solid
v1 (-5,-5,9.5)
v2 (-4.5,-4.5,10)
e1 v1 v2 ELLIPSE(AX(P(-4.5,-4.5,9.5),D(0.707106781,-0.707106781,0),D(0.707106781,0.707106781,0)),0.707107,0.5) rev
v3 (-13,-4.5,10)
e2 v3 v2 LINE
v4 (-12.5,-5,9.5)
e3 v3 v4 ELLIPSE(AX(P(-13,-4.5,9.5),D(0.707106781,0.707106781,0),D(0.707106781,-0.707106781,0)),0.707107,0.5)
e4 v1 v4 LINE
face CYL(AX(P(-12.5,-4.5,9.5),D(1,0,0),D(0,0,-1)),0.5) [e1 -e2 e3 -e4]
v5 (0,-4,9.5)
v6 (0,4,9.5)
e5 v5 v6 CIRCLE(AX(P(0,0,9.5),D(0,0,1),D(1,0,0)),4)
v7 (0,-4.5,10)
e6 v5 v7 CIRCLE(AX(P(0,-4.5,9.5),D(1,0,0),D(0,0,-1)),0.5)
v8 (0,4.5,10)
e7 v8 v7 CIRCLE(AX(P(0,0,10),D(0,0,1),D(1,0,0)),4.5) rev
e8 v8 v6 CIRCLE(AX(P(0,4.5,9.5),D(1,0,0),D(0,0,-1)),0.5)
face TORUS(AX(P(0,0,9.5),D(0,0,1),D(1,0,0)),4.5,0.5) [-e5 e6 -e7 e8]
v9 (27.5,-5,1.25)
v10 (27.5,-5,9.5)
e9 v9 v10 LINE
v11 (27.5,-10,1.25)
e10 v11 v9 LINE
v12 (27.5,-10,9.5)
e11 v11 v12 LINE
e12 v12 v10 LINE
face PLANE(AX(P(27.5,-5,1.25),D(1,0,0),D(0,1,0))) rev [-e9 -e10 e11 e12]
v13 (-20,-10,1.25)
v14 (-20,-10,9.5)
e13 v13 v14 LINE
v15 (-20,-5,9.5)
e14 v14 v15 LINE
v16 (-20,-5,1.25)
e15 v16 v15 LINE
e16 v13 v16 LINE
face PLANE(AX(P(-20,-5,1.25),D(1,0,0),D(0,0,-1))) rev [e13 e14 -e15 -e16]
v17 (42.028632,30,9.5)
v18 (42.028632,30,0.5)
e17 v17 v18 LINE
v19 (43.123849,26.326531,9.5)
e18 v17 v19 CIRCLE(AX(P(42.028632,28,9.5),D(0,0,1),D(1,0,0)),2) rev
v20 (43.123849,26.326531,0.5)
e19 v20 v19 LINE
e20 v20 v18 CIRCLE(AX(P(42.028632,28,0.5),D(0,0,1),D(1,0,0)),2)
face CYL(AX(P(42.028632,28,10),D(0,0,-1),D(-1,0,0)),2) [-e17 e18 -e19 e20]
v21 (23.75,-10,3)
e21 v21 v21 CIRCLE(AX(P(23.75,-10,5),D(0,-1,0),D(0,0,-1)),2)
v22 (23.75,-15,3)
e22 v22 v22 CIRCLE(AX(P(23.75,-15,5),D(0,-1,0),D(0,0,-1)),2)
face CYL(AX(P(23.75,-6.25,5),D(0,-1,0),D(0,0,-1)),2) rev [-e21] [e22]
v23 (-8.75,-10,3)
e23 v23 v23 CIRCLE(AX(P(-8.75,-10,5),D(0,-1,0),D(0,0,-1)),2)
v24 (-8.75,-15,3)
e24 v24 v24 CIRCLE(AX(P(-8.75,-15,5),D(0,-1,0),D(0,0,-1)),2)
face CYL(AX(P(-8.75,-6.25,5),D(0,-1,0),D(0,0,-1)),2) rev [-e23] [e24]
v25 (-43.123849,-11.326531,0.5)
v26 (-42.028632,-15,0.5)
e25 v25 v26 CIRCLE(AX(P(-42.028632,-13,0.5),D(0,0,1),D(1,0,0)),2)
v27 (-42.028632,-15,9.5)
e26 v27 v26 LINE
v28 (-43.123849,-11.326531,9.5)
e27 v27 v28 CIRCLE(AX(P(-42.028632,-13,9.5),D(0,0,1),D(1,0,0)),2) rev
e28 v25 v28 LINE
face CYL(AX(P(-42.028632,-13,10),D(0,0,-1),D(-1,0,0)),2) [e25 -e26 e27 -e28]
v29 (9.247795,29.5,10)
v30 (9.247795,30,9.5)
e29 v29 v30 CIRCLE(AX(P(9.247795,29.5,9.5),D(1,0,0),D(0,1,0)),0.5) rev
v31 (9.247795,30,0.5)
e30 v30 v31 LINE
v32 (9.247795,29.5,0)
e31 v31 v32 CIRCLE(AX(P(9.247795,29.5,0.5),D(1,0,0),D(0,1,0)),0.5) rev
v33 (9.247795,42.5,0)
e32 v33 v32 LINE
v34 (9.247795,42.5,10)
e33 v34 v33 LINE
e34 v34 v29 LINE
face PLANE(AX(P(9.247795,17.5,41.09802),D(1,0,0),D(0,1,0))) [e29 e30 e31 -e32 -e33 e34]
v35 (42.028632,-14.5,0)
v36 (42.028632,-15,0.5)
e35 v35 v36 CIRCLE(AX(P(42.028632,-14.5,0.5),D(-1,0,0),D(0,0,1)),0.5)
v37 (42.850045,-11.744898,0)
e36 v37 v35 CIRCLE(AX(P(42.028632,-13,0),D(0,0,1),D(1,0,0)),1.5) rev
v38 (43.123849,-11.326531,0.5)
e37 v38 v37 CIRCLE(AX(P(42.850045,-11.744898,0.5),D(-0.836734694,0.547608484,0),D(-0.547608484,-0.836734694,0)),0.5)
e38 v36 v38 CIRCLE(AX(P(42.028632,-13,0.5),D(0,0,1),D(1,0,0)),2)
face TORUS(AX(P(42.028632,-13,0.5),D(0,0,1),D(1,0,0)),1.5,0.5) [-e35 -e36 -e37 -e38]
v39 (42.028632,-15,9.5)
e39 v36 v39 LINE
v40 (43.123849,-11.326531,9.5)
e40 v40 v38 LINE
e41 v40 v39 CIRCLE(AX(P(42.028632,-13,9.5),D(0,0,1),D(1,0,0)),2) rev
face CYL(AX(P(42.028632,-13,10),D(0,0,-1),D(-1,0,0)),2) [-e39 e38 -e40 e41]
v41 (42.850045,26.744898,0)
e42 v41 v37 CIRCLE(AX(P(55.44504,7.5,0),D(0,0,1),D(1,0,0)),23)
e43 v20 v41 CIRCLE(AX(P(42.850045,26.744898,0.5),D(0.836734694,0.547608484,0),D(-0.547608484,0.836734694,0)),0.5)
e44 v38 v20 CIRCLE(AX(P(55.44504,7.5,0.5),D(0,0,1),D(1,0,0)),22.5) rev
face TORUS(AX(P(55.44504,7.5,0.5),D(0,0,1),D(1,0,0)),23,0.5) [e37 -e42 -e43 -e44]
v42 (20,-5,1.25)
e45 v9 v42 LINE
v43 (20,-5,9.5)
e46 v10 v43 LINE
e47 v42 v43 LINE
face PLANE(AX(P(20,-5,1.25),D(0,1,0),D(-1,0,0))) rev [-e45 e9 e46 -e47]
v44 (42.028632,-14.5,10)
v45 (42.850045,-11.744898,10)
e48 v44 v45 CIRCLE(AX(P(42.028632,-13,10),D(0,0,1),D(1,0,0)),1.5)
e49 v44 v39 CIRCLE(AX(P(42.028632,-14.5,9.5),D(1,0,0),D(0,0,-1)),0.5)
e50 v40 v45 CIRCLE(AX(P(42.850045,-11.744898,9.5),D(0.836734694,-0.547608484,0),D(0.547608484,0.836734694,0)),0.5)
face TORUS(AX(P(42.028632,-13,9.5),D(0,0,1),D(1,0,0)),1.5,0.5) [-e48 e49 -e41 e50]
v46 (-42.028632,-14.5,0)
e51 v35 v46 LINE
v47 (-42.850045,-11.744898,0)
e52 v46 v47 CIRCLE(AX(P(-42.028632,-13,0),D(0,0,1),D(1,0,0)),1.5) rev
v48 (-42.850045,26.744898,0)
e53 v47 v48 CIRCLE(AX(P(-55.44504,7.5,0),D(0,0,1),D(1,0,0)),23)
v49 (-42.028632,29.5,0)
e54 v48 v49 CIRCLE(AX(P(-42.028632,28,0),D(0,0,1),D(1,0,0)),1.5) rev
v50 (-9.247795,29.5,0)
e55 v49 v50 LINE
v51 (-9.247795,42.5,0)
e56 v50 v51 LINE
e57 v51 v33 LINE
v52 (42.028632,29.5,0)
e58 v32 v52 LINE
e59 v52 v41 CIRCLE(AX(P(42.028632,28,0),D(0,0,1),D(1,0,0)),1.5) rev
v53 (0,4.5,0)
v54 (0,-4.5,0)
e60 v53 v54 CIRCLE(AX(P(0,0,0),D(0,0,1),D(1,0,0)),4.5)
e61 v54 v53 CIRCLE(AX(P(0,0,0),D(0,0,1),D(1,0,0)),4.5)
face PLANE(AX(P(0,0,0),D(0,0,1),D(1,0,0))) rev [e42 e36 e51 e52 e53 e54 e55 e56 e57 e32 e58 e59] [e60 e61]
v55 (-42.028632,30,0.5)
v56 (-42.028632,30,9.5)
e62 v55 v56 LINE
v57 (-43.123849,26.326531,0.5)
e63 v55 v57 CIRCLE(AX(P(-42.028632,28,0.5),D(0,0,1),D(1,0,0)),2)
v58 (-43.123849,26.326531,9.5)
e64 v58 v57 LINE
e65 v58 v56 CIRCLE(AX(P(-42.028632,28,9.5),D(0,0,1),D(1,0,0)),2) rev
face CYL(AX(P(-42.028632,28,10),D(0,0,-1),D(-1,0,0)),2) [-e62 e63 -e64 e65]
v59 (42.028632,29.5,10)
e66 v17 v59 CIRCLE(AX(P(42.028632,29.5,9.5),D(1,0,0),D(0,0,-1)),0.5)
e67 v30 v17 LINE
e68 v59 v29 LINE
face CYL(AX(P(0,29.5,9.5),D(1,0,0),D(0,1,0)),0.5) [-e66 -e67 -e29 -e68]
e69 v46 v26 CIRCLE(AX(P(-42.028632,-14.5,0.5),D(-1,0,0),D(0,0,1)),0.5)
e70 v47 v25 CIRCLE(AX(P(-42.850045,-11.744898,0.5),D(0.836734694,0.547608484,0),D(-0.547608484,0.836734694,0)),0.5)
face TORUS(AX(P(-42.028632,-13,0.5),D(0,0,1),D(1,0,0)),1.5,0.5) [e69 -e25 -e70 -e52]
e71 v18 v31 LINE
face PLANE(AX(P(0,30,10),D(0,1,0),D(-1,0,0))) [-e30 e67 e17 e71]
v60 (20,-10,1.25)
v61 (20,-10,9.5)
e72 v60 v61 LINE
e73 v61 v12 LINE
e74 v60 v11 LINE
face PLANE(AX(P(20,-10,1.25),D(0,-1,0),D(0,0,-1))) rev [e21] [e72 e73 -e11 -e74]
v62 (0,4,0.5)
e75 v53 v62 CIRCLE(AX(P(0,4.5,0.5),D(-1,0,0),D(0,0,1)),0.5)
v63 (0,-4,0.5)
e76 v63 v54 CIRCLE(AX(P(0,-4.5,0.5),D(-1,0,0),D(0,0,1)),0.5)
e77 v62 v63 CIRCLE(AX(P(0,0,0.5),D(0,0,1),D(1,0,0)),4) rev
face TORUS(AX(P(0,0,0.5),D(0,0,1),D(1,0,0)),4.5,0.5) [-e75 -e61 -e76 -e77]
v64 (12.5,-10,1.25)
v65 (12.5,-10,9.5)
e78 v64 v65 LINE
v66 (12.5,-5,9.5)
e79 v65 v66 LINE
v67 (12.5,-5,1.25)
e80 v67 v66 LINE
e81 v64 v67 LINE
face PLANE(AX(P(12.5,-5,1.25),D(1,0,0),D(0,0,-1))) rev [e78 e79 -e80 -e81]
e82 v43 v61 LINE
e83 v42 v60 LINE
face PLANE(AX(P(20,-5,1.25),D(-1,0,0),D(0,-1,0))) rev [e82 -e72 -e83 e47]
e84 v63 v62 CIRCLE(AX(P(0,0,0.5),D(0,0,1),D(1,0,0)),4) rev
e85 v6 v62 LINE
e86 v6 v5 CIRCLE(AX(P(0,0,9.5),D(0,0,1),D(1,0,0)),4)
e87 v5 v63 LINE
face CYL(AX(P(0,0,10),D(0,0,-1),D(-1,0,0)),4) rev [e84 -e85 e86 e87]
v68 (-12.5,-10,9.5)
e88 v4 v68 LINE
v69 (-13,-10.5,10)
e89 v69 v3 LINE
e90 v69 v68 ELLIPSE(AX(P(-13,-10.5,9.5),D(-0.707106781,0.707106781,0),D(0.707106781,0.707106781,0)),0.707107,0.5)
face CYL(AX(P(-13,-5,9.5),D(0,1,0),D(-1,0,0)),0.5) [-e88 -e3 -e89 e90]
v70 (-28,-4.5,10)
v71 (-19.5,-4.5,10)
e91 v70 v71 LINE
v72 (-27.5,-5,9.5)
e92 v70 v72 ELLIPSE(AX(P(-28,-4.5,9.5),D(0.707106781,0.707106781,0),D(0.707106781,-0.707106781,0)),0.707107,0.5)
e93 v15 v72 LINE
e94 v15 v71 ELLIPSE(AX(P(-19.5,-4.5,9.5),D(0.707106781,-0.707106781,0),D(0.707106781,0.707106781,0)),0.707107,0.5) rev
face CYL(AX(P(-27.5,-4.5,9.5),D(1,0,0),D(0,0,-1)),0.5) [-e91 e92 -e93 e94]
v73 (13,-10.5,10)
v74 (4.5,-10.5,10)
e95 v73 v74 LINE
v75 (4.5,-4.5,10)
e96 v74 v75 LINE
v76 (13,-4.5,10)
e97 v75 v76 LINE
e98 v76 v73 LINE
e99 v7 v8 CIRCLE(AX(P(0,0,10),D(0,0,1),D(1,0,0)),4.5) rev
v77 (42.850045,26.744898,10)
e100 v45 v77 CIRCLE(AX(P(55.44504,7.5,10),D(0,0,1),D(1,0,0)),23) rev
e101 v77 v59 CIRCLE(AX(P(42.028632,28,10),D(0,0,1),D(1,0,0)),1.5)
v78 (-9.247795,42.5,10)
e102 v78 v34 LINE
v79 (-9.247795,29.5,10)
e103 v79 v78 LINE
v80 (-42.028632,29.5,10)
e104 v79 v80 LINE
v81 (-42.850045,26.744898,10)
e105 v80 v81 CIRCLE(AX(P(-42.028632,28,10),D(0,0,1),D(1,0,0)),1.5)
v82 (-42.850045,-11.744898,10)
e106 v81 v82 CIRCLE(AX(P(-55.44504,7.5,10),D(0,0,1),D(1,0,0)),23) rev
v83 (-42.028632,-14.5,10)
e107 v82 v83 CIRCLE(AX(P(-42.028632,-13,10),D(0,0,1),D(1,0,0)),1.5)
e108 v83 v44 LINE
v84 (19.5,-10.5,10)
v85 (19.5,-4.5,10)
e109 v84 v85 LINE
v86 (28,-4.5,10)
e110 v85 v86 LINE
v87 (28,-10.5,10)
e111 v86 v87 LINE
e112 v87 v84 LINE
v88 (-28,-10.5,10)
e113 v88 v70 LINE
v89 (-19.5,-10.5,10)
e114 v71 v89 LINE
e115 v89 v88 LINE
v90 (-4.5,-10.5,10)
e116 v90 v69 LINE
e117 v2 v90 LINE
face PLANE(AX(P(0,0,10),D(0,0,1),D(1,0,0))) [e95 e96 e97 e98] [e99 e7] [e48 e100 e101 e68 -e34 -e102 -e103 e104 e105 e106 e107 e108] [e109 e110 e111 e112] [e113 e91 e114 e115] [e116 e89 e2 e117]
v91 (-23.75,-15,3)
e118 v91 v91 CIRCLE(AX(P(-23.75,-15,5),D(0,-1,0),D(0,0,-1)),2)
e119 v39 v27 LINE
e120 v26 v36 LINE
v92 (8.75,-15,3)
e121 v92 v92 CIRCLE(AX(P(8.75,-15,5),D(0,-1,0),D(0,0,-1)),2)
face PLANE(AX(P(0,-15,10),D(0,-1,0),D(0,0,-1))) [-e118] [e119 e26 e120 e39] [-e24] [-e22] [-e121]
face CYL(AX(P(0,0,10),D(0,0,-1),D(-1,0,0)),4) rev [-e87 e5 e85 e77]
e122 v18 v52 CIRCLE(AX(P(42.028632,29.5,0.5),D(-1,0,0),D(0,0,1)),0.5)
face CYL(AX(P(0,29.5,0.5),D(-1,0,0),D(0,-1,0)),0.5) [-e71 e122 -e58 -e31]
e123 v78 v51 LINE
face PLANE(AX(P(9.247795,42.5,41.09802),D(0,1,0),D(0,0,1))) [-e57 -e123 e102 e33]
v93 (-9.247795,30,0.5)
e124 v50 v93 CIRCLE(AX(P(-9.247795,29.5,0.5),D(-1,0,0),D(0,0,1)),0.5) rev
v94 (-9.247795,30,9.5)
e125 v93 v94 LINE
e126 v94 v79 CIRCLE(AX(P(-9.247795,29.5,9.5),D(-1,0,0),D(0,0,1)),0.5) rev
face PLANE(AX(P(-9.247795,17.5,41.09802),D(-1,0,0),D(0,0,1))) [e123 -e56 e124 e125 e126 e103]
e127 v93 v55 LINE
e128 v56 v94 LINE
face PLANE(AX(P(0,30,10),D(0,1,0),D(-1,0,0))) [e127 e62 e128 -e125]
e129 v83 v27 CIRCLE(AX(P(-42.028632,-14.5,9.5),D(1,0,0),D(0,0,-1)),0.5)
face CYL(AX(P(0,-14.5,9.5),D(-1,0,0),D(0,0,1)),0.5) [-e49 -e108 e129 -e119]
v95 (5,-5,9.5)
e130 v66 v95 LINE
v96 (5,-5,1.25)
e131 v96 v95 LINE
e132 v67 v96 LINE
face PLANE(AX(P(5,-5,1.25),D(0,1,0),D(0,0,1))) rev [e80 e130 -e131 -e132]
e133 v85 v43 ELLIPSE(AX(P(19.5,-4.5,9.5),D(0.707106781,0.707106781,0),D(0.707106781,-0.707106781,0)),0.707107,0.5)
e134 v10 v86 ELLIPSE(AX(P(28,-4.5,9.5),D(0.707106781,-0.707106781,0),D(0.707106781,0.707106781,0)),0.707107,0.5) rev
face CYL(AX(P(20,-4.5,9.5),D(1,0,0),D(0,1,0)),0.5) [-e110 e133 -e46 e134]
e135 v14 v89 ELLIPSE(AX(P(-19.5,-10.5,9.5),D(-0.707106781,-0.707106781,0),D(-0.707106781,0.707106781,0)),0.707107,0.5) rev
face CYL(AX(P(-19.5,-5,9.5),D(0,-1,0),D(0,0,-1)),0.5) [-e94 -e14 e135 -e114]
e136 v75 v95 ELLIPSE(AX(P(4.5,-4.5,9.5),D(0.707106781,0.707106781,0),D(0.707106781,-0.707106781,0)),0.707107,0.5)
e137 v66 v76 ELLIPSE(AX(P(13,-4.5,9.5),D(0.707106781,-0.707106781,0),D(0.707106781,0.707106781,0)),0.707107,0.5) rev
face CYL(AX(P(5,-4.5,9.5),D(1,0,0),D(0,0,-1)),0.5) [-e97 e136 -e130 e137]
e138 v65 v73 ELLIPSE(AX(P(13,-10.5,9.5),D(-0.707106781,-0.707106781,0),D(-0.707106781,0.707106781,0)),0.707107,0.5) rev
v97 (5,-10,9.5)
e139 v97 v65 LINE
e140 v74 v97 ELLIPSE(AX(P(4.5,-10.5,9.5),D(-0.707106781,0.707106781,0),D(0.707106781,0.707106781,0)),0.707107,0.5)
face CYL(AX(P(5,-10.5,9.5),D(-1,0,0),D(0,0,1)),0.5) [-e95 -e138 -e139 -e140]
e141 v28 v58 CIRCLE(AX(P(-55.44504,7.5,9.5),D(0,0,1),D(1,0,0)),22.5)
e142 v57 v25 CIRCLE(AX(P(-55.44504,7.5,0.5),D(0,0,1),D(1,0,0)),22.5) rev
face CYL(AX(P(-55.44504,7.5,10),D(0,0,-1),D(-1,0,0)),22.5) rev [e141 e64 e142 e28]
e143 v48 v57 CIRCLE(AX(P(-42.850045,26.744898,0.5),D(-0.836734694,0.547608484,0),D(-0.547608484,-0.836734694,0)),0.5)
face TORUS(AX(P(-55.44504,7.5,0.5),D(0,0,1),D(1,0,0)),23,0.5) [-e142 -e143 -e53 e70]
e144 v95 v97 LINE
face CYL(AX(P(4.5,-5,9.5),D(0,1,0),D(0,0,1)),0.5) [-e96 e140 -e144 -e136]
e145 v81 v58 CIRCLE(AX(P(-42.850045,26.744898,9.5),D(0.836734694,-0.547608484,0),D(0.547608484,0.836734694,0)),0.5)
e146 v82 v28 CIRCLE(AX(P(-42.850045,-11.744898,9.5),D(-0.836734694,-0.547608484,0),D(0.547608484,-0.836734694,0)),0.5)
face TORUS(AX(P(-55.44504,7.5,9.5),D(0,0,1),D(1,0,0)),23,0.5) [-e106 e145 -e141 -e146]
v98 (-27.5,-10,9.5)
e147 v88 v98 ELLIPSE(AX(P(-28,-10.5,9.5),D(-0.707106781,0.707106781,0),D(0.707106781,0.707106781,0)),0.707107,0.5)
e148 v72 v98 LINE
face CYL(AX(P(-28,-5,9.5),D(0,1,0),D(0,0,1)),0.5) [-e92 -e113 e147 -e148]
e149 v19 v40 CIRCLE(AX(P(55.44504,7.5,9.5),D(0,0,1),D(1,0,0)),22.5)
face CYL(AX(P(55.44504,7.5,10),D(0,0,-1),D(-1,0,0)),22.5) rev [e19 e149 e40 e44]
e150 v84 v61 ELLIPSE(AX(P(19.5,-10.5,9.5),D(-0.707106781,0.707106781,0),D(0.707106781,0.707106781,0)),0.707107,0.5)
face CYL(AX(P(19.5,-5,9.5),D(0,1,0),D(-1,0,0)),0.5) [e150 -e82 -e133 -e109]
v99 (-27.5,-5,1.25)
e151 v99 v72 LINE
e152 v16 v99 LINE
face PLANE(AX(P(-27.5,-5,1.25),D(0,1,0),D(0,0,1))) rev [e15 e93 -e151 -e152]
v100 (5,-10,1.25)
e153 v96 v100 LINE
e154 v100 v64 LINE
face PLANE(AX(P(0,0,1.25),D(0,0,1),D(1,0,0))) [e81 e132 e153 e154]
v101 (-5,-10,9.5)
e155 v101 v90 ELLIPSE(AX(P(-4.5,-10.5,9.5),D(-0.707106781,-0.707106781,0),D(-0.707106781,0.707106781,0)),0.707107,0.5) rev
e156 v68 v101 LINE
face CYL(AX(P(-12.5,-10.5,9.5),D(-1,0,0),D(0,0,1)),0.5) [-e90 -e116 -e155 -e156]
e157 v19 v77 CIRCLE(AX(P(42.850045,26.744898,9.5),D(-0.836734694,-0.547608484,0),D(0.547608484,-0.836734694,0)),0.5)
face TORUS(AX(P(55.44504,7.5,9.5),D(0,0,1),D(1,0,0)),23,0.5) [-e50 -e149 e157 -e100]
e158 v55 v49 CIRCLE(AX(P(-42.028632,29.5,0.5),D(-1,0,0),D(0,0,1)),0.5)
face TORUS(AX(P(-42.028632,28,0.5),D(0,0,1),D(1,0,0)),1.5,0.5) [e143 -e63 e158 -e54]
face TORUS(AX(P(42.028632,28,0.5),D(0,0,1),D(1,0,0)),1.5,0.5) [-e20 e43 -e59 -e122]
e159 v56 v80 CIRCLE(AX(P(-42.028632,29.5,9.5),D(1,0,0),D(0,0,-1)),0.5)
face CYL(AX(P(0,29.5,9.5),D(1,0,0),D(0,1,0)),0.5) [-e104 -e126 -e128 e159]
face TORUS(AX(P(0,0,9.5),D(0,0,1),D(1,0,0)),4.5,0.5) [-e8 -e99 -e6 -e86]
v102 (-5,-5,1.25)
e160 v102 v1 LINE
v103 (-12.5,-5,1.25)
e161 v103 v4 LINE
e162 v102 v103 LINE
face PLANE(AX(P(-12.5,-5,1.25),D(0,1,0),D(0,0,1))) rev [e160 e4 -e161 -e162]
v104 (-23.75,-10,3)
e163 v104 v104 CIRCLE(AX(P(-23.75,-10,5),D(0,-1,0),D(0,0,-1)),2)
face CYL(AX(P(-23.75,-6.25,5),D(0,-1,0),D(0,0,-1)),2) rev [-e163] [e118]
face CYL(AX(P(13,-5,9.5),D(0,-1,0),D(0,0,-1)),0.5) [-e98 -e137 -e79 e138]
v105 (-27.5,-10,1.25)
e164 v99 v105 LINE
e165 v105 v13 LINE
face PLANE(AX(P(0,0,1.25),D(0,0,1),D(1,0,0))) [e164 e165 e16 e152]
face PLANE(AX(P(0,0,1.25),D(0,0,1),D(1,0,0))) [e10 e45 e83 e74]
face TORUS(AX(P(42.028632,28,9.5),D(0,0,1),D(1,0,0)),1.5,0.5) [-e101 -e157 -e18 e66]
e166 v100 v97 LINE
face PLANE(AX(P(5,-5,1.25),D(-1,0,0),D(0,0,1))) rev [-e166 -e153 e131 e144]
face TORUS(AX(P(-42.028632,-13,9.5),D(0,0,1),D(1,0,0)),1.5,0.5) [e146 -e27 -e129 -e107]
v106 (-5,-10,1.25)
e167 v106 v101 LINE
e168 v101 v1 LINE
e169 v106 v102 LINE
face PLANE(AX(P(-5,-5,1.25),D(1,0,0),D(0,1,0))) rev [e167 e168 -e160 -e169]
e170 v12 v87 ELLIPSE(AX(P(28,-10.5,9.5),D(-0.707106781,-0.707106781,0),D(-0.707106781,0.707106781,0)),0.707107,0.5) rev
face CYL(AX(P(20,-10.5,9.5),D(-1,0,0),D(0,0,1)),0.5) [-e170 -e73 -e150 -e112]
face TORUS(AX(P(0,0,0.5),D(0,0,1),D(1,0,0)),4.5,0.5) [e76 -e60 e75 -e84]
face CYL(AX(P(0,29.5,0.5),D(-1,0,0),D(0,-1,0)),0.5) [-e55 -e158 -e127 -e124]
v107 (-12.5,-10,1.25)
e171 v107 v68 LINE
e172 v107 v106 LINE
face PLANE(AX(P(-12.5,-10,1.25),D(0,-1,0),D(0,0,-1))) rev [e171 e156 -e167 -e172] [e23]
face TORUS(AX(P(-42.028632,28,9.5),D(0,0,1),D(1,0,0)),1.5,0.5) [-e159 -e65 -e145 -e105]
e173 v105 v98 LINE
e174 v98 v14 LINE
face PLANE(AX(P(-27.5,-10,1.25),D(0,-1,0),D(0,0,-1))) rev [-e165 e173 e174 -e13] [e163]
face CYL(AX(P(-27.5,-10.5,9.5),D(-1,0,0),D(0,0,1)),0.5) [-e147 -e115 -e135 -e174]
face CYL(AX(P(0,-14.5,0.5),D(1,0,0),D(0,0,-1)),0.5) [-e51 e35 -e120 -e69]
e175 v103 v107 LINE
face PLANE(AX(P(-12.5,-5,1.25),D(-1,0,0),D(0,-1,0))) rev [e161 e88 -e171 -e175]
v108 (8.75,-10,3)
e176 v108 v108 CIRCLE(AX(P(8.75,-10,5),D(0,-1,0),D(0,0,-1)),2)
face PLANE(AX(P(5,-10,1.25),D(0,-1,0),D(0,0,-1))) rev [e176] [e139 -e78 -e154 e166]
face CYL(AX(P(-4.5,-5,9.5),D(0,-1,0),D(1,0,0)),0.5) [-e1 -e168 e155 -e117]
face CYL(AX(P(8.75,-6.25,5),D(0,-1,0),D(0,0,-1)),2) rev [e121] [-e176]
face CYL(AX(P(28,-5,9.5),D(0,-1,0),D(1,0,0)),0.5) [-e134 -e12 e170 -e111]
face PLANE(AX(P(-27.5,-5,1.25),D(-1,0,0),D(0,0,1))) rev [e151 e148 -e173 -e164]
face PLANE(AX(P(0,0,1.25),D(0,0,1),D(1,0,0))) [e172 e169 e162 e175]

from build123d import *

# Parameters (mm, degrees)
BOSS_EXTRUDE1_DEPTH = 10
FILLET1_START       = -1
FILLET1_DEPTH       = 12
SKETCH2_W           = 7.5
SKETCH2_H           = 5
CUT_EXTRUDE1_DEPTH  = 8.75
SKETCH3_R           = 2
CUT_EXTRUDE2_DEPTH  = 8.75
FILLET2_R           = 0.5
BOSS_EXTRUDE2_START = -10
SKETCH5_W           = 18.495590606
SKETCH5_H           = 25
BOSS_EXTRUDE2_DEPTH = 10


with BuildPart() as part:
    # Sketch1 → Boss-Extrude1 (new body)
    with BuildSketch(Plane.XY):
        with BuildLine():
            Line((0, -15), (55.445040355, -15))
            ThreePointArc((55.445040355, -15), (32.945040355, 7.5), (55.445040355, 30))
            Line((55.445040355, 30), (-55.445040355, 30))
            ThreePointArc((-55.445040355, 30), (-39.535137779, 23.409902577), (-32.945040355, 7.5))
            ThreePointArc((-32.945040355, 7.5), (-39.535137779, -8.409902577), (-55.445040355, -15))
            Line((-55.445040355, -15), (0, -15))
        make_face()
        with BuildLine():
            ThreePointArc((4, 0), (2.828427125, -2.828427125), (0, -4))
            ThreePointArc((0, -4), (-4, 0), (0, 4))
            ThreePointArc((0, 4), (2.828427125, 2.828427125), (4, 0))
        make_face(mode=Mode.SUBTRACT)
    extrude(amount=BOSS_EXTRUDE1_DEPTH)

    # Fillet1: read off the stored shape, not the designer's step
    # Fillet1 outline → Fillet1 (cut)
    with BuildSketch(Plane.XY.offset(FILLET1_START)):
        with BuildLine():
            Line((55.445040355, 30), (42.02863249, 30))
            ThreePointArc((42.02863249, 30), (43.945262185, 28.571428571), (43.123849459, 26.326530612))
            ThreePointArc((43.123849459, 26.326530612), (49.016468927, 29.062084069), (55.445040355, 30))
        make_face()
        with BuildLine():
            ThreePointArc((-43.123849459, 26.326530612), (-43.945262185, 28.571428571), (-42.02863249, 30))
            Line((-42.02863249, 30), (-55.445040355, 30))
            ThreePointArc((-55.445040355, 30), (-49.016468927, 29.062084069), (-43.123849459, 26.326530612))
        make_face()
        with BuildLine():
            ThreePointArc((55.445040355, -15), (49.016468927, -14.062084069), (43.123849459, -11.326530612))
            ThreePointArc((43.123849459, -11.326530612), (43.945262185, -13.571428571), (42.02863249, -15))
            Line((42.02863249, -15), (55.445040355, -15))
        make_face()
        with BuildLine():
            ThreePointArc((-42.02863249, -15), (-43.945262185, -13.571428571), (-43.123849459, -11.326530612))
            ThreePointArc((-43.123849459, -11.326530612), (-49.016468927, -14.062084069), (-55.445040355, -15))
            Line((-55.445040355, -15), (-42.02863249, -15))
        make_face()
    extrude(amount=FILLET1_DEPTH, mode=Mode.SUBTRACT)

    # Sketch2 → Cut-Extrude1 (cut)
    with BuildSketch(Plane.XY.offset(10)):
        with Locations((-23.75, -7.5)):
            Rectangle(SKETCH2_W, SKETCH2_H)
        with Locations((-8.75, -7.5)):
            Rectangle(SKETCH2_W, SKETCH2_H)
        with Locations((8.75, -7.5)):
            Rectangle(SKETCH2_W, SKETCH2_H)
        with Locations((23.75, -7.5)):
            Rectangle(SKETCH2_W, SKETCH2_H)
    extrude(amount=-CUT_EXTRUDE1_DEPTH, mode=Mode.SUBTRACT)

    # Sketch3 → Cut-Extrude2 (cut)
    with BuildSketch(Plane.XZ.offset(15)):
        with Locations(Location((-23.75, 5, 0), (0, 0, 270))):
            Circle(SKETCH3_R)
        with Locations(Location((-8.75, 5, 0), (0, 0, 270))):
            Circle(SKETCH3_R)
        with Locations(Location((8.75, 5, 0), (0, 0, 270))):
            Circle(SKETCH3_R)
        with Locations(Location((23.75, 5, 0), (0, 0, 270))):
            Circle(SKETCH3_R)
    extrude(amount=-CUT_EXTRUDE2_DEPTH, mode=Mode.SUBTRACT)

    # Fillet2
    fillet2_edges = [part.edges().sort_by_distance(p)[0] for p in [
        (0, 4, 0),
        (0, 4, 0),
        (0, 4, 10),
        (0, 30, 0),
        (0, 30, 10),
        (-32.945040355, 7.5, 0),
        (32.945040355, 7.5, 0),
        (0, -15, 0),
        (-43.945262185, -13.571428571, 0),
        (-43.945262185, 28.571428571, 0),
        (43.945262185, -13.571428571, 0),
        (43.945262185, 28.571428571, 0),
        (32.945040355, 7.5, 10),
        (-32.945040355, 7.5, 10),
        (0, -15, 10),
        (-43.945262185, -13.571428571, 10),
        (-43.945262185, 28.571428571, 10),
        (43.945262185, -13.571428571, 10),
        (43.945262185, 28.571428571, 10),
        (0, 4, 10),
        (-20, -7.5, 10),
        (-23.75, -5, 10),
        (-27.5, -7.5, 10),
        (-23.75, -10, 10),
        (-5, -7.5, 10),
        (-8.75, -5, 10),
        (-12.5, -7.5, 10),
        (-8.75, -10, 10),
        (12.5, -7.5, 10),
        (8.75, -5, 10),
        (5, -7.5, 10),
        (8.75, -10, 10),
        (27.5, -7.5, 10),
        (23.75, -5, 10),
        (20, -7.5, 10),
        (23.75, -10, 10),
    ]]
    fillet(fillet2_edges, radius=FILLET2_R)

    # Sketch5 → Boss-Extrude2 (add)
    with BuildSketch(Plane(origin=(0, 0, 0), x_dir=(-1, 0, 0), z_dir=(0, 0, -1)).offset(BOSS_EXTRUDE2_START)):
        with Locations((0, 30)):
            Rectangle(SKETCH5_W, SKETCH5_H)
    extrude(amount=BOSS_EXTRUDE2_DEPTH)


solid = part.part
